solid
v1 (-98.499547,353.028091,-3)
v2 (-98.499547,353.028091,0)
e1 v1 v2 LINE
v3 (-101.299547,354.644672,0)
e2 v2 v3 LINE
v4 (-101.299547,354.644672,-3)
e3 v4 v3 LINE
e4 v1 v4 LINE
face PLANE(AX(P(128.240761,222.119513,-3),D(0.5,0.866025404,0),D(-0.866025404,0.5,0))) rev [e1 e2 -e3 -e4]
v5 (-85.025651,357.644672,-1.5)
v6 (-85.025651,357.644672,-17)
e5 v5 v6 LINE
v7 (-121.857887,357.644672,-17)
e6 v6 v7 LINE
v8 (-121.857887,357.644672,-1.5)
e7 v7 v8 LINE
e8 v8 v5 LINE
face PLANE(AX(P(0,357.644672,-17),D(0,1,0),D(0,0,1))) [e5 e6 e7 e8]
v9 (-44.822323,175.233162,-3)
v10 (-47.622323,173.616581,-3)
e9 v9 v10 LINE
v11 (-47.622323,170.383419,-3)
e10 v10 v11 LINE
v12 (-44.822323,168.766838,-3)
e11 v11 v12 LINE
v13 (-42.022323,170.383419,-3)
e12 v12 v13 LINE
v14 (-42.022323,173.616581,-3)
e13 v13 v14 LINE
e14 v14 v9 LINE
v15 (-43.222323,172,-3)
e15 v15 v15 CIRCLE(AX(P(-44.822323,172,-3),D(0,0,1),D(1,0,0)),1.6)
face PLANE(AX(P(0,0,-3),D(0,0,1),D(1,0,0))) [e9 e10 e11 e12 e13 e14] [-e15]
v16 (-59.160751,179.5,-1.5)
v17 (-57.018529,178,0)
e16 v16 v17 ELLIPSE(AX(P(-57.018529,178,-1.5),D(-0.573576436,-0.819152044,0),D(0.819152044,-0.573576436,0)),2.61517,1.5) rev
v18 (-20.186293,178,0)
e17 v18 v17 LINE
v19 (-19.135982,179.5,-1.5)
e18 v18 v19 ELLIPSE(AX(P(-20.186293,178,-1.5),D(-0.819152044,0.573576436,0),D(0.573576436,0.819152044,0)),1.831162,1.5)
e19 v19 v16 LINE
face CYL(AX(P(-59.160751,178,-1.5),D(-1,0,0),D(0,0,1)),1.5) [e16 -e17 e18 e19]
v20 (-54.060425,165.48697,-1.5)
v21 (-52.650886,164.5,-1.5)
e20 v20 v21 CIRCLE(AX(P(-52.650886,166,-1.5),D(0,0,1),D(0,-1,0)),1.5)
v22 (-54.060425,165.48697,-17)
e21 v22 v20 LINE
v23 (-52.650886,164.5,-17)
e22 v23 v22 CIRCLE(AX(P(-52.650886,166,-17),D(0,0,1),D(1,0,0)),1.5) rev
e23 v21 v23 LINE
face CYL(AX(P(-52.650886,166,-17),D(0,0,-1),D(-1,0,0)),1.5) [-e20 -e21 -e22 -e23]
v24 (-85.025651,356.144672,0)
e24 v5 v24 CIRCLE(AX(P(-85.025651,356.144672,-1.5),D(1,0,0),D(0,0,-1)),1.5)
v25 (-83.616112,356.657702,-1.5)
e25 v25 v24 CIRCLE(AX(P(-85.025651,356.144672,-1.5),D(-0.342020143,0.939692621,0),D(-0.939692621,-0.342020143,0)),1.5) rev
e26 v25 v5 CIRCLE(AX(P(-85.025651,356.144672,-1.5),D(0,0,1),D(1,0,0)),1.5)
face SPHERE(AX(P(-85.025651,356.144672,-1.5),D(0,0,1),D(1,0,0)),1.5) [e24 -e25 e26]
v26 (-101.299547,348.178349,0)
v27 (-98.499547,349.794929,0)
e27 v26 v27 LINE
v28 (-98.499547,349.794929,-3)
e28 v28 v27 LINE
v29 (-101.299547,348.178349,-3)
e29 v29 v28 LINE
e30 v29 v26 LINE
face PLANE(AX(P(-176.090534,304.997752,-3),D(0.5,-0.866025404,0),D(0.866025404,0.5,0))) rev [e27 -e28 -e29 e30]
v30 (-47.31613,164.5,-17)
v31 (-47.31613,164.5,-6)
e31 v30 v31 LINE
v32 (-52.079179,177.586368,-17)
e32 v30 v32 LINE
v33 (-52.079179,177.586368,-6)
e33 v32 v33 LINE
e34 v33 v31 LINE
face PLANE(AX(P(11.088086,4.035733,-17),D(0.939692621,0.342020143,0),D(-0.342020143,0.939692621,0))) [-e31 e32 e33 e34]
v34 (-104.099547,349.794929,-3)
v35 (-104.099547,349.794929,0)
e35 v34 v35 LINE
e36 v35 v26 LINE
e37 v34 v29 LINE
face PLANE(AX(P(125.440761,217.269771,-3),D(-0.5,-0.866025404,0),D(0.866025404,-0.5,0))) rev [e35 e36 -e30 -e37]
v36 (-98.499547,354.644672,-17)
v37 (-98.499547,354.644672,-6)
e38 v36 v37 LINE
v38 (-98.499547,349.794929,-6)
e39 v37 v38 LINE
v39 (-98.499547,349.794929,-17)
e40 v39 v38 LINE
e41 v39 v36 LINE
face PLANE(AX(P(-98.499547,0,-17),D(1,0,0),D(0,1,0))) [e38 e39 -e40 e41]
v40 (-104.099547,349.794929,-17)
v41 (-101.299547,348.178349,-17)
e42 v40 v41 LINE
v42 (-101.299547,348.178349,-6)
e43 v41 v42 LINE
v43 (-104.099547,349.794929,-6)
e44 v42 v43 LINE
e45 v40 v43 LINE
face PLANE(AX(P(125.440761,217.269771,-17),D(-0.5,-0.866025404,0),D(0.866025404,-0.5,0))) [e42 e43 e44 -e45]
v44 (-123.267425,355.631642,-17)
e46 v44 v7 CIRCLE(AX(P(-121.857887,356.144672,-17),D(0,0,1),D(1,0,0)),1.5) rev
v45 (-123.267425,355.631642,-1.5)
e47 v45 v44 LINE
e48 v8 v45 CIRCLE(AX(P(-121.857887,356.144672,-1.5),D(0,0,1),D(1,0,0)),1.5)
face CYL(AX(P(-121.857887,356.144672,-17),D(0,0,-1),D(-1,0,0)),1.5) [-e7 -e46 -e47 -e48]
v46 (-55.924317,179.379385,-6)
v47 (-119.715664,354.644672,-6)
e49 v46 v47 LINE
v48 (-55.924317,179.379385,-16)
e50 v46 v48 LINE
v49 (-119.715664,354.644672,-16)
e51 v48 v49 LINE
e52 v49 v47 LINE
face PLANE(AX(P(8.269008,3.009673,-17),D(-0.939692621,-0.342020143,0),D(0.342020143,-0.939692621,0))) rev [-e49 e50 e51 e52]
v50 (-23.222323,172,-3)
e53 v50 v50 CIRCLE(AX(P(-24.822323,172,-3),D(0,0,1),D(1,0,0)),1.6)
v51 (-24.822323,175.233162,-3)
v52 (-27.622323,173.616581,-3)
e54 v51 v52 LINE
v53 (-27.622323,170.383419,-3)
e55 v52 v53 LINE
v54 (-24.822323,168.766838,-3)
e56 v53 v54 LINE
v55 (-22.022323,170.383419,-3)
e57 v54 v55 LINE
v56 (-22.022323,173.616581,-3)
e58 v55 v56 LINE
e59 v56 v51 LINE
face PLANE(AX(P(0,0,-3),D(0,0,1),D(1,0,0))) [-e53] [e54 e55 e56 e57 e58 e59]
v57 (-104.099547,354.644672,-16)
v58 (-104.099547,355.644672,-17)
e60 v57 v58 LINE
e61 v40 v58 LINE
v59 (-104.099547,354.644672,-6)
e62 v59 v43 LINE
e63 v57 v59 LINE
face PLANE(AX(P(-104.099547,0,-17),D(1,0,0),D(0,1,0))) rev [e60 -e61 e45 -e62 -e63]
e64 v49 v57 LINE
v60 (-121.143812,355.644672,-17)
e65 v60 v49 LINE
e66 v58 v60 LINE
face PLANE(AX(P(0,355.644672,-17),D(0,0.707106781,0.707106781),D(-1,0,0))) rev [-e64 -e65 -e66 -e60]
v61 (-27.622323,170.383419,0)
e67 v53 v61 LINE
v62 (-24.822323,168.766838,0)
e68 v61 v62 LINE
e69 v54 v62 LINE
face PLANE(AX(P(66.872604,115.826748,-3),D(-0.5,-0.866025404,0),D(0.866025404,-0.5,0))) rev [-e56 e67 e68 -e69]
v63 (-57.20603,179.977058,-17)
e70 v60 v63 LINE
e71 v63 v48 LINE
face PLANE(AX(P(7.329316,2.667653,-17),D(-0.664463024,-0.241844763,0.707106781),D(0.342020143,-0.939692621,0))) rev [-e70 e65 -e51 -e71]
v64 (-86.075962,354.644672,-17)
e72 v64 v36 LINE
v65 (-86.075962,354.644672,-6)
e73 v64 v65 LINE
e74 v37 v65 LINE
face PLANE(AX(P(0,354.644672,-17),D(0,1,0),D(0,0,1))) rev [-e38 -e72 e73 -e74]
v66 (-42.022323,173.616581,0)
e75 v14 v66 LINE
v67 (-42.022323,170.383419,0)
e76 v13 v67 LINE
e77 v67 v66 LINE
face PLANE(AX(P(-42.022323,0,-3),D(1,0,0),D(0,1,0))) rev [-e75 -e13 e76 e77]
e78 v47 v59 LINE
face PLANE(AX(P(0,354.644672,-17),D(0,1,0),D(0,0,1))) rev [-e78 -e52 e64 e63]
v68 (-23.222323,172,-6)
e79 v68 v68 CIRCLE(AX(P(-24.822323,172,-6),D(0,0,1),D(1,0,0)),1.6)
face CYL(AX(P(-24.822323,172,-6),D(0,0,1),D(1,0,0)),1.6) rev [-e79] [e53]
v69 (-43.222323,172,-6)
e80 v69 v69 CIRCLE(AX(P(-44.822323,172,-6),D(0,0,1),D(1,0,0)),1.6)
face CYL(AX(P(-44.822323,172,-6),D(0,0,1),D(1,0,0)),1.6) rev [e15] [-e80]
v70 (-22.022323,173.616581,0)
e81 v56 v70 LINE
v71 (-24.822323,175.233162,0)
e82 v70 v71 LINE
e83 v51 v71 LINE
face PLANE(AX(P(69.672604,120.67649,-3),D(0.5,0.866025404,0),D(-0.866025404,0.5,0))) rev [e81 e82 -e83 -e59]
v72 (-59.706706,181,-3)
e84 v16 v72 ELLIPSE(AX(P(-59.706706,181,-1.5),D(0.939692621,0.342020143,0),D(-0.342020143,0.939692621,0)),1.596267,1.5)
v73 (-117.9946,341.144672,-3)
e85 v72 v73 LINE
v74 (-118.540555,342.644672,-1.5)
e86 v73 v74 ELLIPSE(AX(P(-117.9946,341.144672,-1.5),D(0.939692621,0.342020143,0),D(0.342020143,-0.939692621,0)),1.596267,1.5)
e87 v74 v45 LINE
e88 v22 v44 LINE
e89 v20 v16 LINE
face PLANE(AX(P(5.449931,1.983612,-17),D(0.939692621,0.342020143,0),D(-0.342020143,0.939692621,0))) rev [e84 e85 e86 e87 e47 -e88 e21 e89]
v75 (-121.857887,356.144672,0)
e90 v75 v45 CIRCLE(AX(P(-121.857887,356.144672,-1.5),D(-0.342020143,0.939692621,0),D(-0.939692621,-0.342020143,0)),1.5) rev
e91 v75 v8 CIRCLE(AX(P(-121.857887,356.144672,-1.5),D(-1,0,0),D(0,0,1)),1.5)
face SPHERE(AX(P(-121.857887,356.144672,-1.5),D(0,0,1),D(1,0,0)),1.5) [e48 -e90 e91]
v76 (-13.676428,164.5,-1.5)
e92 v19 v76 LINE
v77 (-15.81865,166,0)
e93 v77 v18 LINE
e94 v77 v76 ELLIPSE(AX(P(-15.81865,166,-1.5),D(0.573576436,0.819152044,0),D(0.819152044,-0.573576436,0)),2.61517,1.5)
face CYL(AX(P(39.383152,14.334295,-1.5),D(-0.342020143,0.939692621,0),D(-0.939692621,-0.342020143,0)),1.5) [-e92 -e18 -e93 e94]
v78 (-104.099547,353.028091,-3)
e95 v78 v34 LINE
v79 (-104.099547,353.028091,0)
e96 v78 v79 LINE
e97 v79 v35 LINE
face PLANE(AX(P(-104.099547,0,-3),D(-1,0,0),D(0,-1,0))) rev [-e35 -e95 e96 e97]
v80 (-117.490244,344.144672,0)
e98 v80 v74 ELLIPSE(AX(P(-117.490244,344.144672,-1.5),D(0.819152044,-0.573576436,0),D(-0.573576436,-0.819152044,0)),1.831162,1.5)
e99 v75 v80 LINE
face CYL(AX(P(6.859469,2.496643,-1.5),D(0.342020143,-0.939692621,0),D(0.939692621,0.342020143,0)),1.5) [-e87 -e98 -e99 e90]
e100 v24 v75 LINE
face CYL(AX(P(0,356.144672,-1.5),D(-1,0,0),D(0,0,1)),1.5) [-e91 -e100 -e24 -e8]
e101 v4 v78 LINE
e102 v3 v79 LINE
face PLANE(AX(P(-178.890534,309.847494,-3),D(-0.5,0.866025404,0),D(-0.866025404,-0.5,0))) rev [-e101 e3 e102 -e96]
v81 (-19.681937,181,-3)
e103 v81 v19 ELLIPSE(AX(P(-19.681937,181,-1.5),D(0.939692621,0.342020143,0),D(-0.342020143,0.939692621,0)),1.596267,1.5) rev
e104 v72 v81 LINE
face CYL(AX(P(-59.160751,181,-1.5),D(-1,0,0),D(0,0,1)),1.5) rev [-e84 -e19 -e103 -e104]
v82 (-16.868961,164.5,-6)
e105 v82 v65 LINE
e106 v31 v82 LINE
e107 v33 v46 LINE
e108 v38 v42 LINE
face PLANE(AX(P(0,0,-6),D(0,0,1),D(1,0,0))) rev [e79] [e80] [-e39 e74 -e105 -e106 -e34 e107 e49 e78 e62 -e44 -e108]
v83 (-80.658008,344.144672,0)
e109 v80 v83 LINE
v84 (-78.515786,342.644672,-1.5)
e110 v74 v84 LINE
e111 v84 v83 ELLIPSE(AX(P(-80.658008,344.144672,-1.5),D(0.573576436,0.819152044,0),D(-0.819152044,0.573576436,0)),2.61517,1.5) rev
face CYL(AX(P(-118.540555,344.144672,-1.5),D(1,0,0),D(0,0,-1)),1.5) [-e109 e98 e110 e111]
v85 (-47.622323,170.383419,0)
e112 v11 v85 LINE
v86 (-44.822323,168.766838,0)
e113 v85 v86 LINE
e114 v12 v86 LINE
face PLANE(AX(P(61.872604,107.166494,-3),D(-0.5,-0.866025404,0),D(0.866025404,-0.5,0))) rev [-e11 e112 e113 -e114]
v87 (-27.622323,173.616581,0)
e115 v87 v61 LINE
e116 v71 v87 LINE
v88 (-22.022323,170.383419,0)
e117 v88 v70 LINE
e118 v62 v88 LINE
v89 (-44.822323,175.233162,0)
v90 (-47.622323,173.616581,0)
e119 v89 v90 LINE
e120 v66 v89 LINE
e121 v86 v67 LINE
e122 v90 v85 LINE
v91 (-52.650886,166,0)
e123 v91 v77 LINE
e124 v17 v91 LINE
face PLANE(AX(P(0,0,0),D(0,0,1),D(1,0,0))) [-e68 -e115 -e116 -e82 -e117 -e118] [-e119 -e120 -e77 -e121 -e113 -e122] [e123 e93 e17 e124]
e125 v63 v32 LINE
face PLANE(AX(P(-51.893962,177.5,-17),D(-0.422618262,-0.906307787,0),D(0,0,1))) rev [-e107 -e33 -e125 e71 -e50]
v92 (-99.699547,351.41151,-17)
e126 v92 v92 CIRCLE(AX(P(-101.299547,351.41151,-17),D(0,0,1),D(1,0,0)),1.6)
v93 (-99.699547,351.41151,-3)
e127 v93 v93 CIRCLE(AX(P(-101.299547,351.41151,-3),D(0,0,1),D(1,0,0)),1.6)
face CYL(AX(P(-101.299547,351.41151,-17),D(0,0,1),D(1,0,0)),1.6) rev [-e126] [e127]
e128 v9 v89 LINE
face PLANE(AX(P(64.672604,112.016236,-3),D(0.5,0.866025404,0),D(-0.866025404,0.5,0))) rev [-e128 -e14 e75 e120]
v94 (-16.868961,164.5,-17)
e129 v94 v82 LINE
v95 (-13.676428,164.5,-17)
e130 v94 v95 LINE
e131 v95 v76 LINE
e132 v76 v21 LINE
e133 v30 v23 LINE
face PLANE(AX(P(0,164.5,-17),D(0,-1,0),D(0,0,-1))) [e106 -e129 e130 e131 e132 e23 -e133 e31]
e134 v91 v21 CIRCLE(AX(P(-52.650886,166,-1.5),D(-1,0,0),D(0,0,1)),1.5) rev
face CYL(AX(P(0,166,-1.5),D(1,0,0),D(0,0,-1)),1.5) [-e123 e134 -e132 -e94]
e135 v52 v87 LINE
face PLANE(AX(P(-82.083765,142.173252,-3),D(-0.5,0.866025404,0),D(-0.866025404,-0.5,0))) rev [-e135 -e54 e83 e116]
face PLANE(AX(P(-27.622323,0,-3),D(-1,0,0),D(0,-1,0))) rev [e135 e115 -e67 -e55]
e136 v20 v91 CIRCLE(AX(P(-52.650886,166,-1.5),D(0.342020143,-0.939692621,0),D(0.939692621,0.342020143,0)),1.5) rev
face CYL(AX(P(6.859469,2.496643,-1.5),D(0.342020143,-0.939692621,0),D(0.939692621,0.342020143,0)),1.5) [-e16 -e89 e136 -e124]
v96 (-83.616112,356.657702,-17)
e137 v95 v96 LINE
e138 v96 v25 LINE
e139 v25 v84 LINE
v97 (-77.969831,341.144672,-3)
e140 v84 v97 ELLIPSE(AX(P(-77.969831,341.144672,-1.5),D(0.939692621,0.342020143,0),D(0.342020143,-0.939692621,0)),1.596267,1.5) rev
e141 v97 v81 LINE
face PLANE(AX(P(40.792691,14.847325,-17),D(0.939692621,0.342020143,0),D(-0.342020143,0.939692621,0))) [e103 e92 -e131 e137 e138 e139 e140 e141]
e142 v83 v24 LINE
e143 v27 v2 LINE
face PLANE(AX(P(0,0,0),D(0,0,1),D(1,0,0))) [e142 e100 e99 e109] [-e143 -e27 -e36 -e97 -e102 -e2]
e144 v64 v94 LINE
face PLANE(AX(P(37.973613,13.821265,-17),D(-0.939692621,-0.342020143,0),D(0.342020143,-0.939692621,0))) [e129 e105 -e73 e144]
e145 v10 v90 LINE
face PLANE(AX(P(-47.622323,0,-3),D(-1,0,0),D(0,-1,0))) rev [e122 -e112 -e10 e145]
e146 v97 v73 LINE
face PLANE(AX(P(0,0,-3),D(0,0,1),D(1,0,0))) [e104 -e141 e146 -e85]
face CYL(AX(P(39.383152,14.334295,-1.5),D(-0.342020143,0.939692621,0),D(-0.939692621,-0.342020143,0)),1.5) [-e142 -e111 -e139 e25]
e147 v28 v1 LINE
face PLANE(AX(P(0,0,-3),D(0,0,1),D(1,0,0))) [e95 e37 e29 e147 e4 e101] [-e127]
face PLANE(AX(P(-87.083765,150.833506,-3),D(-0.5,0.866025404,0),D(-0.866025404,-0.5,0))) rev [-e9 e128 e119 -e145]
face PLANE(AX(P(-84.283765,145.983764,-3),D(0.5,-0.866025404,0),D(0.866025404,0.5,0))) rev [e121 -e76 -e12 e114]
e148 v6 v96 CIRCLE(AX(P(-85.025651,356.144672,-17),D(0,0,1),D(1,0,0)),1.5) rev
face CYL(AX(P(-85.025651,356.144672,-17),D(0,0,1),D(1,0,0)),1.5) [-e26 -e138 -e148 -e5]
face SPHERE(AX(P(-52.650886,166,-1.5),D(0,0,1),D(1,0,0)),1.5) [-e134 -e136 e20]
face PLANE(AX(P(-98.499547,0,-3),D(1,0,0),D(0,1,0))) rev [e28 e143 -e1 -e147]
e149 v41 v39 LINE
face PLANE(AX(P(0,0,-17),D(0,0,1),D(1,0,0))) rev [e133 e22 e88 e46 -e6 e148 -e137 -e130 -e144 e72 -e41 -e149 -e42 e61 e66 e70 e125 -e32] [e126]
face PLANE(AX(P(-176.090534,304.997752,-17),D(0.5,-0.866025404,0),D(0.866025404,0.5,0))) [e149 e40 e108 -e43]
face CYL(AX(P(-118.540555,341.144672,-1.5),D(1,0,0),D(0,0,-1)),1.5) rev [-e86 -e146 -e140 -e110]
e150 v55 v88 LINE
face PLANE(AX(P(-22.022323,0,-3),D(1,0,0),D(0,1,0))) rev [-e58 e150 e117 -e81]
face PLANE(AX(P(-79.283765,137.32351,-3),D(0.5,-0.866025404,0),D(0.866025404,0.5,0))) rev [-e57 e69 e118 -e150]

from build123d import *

# Parameters (mm, degrees)
SKETCH2_R           = 1.6
BOSS_EXTRUDE1_DEPTH = 17
SKETCH2_17_R        = 1.6
BOSS_EXTRUDE2_DEPTH = 6
CUT_EXTRUDE1_DEPTH  = 3
CUT_EXTRUDE2_DEPTH  = 3
FILLET1_R           = 1.5
CHAMFER3_SIZE       = 1


# Some blends are built 0.0001 mm under size
with BuildPart() as part:
    # Sketch2 → Boss-Extrude1 (new body)
    with BuildSketch(Plane.XY):
        Polygon((-47.316130455, 164.5), (-52.0477435, 177.5), (-55.240276817, 177.5), (-119.71566449, 354.644671741), (-104.09954666, 354.644671741), (-104.09954666, 349.79492948), (-101.29954666, 348.178348727), (-98.49954666, 349.79492948), (-98.49954666, 354.644671741), (-86.075962148, 354.644671741), (-16.868961429, 164.5), (-13.676428112, 164.5), (-83.975339533, 357.644671741), (-124.00010851, 357.644671741), (-53.701197089, 164.5), align=None)
        with Locations((-101.29954666, 351.411510234)):
            Circle(SKETCH2_R, mode=Mode.SUBTRACT)
    extrude(amount=-BOSS_EXTRUDE1_DEPTH)

    # Sketch2<17> → Boss-Extrude2 (add)
    with BuildSketch(Plane.XY):
        Polygon((-52.0477435, 177.5), (-47.316130455, 164.5), (-16.868961429, 164.5), (-86.075962148, 354.644671741), (-98.49954666, 354.644671741), (-98.49954666, 349.79492948), (-101.29954666, 348.178348727), (-104.09954666, 349.79492948), (-104.09954666, 354.644671741), (-119.71566449, 354.644671741), (-55.240276817, 177.5), align=None)
        with Locations((-44.822322699, 172)):
            Circle(SKETCH2_17_R, mode=Mode.SUBTRACT)
        with Locations((-24.822322699, 172)):
            Circle(SKETCH2_17_R, mode=Mode.SUBTRACT)
    extrude(amount=-BOSS_EXTRUDE2_DEPTH)

    # Sketch2<18> → Cut-Extrude1 (cut)
    with BuildSketch(Plane.XY):
        Polygon((-24.822322699, 168.766838493), (-22.022322699, 170.383419246), (-22.022322699, 173.616580754), (-24.822322699, 175.233161507), (-27.622322699, 173.616580754), (-27.622322699, 170.383419246), align=None)
        Polygon((-44.822322699, 168.766838493), (-42.022322699, 170.383419246), (-42.022322699, 173.616580754), (-44.822322699, 175.233161507), (-47.622322699, 173.616580754), (-47.622322699, 170.383419246), align=None)
        Polygon((-101.29954666, 354.644671741), (-104.09954666, 353.028090988), (-104.09954666, 349.79492948), (-101.29954666, 348.178348727), (-98.49954666, 349.79492948), (-98.49954666, 353.028090988), align=None)
    extrude(amount=-CUT_EXTRUDE1_DEPTH, mode=Mode.SUBTRACT)

    # Sketch5 → Cut-Extrude2 (cut)
    with BuildSketch(Plane.XY):
        Polygon((-118.540554996, 342.644671741), (-78.515786019, 342.644671741), (-19.135981626, 179.5), (-59.160750603, 179.5), align=None)
    extrude(amount=-CUT_EXTRUDE2_DEPTH, mode=Mode.SUBTRACT)

    # Fillet1
    fillet1_edges = [part.edges().sort_by_distance(p)[0] for p in [
        (-121.270331753, 350.144671741, 0),
        (-81.245562776, 350.144671741, 0),
        (-39.148366115, 179.5, 0),
        (-98.528170508, 342.644671741, 0),
        (-98.528170508, 342.644671741, -3),
        (-39.148366115, 179.5, -3),
        (-56.430973846, 172, 0),
        (-103.987724022, 357.644671741, 0),
        (-16.406204869, 172, 0),
        (-33.688812601, 164.5, 0),
        (-53.701197089, 164.5, -8.5),
        (-124.00010851, 357.644671741, -8.5),
        (-83.975339533, 357.644671741, -8.5),
    ]]
    fillet(fillet1_edges, radius=FILLET1_R - 0.0001)  # a hair under: the kernel refuses the full size

    # Chamfer2
    # the kernel refuses this chamfer: 3.34631437, 2 mm, written as the material it adds along each edge
    with BuildSketch(Plane(origin=(-55.240276817, 177.5, -6), x_dir=(0.9998669641130704, -0.01631116413110759, 0), z_dir=(0, 0, -1))) as chamfer2_piece_1_section:
        with BuildLine():
            Line((3.468087381, 0), (-0.836822437, -1.922560005))
            Line((-0.836822437, -1.922560005), (-0.899330844, -1.898647101))
            ThreePointArc((-0.899330844, -1.898647101), (-0.436719507, -0.954276075), (-0.062508407, 0.023912905))
            Line((-0.062508407, 0.023912905), (0.001091646, 0.066917384))
            ThreePointArc((0.001091646, 0.066917384), (1.734673987, 0.038636875), (3.469179027, 0.066917384))
            Line((3.469179027, 0.066917384), (3.468087381, 0))
        make_face()
    chamfer2_piece_1 = extrude(amount=11, mode=Mode.PRIVATE)
    chamfer2_piece_1 = split(chamfer2_piece_1, bisect_by=Plane(origin=(-52.5138481, 178.780611864, -11.5), z_dir=(-0.9396926207859072, -0.34202014332567215, 0)), keep=Keep.TOP, mode=Mode.PRIVATE)
    add(chamfer2_piece_1)

    # Chamfer3
    chamfer3_edges = [part.edges().sort_by_distance(p)[0] for p in [
        (-87.819990797, 267.012028492, -17),
        (-111.907605575, 354.644671741, -17),
    ]]
    chamfer(chamfer3_edges, length=CHAMFER3_SIZE)


solid = part.part
